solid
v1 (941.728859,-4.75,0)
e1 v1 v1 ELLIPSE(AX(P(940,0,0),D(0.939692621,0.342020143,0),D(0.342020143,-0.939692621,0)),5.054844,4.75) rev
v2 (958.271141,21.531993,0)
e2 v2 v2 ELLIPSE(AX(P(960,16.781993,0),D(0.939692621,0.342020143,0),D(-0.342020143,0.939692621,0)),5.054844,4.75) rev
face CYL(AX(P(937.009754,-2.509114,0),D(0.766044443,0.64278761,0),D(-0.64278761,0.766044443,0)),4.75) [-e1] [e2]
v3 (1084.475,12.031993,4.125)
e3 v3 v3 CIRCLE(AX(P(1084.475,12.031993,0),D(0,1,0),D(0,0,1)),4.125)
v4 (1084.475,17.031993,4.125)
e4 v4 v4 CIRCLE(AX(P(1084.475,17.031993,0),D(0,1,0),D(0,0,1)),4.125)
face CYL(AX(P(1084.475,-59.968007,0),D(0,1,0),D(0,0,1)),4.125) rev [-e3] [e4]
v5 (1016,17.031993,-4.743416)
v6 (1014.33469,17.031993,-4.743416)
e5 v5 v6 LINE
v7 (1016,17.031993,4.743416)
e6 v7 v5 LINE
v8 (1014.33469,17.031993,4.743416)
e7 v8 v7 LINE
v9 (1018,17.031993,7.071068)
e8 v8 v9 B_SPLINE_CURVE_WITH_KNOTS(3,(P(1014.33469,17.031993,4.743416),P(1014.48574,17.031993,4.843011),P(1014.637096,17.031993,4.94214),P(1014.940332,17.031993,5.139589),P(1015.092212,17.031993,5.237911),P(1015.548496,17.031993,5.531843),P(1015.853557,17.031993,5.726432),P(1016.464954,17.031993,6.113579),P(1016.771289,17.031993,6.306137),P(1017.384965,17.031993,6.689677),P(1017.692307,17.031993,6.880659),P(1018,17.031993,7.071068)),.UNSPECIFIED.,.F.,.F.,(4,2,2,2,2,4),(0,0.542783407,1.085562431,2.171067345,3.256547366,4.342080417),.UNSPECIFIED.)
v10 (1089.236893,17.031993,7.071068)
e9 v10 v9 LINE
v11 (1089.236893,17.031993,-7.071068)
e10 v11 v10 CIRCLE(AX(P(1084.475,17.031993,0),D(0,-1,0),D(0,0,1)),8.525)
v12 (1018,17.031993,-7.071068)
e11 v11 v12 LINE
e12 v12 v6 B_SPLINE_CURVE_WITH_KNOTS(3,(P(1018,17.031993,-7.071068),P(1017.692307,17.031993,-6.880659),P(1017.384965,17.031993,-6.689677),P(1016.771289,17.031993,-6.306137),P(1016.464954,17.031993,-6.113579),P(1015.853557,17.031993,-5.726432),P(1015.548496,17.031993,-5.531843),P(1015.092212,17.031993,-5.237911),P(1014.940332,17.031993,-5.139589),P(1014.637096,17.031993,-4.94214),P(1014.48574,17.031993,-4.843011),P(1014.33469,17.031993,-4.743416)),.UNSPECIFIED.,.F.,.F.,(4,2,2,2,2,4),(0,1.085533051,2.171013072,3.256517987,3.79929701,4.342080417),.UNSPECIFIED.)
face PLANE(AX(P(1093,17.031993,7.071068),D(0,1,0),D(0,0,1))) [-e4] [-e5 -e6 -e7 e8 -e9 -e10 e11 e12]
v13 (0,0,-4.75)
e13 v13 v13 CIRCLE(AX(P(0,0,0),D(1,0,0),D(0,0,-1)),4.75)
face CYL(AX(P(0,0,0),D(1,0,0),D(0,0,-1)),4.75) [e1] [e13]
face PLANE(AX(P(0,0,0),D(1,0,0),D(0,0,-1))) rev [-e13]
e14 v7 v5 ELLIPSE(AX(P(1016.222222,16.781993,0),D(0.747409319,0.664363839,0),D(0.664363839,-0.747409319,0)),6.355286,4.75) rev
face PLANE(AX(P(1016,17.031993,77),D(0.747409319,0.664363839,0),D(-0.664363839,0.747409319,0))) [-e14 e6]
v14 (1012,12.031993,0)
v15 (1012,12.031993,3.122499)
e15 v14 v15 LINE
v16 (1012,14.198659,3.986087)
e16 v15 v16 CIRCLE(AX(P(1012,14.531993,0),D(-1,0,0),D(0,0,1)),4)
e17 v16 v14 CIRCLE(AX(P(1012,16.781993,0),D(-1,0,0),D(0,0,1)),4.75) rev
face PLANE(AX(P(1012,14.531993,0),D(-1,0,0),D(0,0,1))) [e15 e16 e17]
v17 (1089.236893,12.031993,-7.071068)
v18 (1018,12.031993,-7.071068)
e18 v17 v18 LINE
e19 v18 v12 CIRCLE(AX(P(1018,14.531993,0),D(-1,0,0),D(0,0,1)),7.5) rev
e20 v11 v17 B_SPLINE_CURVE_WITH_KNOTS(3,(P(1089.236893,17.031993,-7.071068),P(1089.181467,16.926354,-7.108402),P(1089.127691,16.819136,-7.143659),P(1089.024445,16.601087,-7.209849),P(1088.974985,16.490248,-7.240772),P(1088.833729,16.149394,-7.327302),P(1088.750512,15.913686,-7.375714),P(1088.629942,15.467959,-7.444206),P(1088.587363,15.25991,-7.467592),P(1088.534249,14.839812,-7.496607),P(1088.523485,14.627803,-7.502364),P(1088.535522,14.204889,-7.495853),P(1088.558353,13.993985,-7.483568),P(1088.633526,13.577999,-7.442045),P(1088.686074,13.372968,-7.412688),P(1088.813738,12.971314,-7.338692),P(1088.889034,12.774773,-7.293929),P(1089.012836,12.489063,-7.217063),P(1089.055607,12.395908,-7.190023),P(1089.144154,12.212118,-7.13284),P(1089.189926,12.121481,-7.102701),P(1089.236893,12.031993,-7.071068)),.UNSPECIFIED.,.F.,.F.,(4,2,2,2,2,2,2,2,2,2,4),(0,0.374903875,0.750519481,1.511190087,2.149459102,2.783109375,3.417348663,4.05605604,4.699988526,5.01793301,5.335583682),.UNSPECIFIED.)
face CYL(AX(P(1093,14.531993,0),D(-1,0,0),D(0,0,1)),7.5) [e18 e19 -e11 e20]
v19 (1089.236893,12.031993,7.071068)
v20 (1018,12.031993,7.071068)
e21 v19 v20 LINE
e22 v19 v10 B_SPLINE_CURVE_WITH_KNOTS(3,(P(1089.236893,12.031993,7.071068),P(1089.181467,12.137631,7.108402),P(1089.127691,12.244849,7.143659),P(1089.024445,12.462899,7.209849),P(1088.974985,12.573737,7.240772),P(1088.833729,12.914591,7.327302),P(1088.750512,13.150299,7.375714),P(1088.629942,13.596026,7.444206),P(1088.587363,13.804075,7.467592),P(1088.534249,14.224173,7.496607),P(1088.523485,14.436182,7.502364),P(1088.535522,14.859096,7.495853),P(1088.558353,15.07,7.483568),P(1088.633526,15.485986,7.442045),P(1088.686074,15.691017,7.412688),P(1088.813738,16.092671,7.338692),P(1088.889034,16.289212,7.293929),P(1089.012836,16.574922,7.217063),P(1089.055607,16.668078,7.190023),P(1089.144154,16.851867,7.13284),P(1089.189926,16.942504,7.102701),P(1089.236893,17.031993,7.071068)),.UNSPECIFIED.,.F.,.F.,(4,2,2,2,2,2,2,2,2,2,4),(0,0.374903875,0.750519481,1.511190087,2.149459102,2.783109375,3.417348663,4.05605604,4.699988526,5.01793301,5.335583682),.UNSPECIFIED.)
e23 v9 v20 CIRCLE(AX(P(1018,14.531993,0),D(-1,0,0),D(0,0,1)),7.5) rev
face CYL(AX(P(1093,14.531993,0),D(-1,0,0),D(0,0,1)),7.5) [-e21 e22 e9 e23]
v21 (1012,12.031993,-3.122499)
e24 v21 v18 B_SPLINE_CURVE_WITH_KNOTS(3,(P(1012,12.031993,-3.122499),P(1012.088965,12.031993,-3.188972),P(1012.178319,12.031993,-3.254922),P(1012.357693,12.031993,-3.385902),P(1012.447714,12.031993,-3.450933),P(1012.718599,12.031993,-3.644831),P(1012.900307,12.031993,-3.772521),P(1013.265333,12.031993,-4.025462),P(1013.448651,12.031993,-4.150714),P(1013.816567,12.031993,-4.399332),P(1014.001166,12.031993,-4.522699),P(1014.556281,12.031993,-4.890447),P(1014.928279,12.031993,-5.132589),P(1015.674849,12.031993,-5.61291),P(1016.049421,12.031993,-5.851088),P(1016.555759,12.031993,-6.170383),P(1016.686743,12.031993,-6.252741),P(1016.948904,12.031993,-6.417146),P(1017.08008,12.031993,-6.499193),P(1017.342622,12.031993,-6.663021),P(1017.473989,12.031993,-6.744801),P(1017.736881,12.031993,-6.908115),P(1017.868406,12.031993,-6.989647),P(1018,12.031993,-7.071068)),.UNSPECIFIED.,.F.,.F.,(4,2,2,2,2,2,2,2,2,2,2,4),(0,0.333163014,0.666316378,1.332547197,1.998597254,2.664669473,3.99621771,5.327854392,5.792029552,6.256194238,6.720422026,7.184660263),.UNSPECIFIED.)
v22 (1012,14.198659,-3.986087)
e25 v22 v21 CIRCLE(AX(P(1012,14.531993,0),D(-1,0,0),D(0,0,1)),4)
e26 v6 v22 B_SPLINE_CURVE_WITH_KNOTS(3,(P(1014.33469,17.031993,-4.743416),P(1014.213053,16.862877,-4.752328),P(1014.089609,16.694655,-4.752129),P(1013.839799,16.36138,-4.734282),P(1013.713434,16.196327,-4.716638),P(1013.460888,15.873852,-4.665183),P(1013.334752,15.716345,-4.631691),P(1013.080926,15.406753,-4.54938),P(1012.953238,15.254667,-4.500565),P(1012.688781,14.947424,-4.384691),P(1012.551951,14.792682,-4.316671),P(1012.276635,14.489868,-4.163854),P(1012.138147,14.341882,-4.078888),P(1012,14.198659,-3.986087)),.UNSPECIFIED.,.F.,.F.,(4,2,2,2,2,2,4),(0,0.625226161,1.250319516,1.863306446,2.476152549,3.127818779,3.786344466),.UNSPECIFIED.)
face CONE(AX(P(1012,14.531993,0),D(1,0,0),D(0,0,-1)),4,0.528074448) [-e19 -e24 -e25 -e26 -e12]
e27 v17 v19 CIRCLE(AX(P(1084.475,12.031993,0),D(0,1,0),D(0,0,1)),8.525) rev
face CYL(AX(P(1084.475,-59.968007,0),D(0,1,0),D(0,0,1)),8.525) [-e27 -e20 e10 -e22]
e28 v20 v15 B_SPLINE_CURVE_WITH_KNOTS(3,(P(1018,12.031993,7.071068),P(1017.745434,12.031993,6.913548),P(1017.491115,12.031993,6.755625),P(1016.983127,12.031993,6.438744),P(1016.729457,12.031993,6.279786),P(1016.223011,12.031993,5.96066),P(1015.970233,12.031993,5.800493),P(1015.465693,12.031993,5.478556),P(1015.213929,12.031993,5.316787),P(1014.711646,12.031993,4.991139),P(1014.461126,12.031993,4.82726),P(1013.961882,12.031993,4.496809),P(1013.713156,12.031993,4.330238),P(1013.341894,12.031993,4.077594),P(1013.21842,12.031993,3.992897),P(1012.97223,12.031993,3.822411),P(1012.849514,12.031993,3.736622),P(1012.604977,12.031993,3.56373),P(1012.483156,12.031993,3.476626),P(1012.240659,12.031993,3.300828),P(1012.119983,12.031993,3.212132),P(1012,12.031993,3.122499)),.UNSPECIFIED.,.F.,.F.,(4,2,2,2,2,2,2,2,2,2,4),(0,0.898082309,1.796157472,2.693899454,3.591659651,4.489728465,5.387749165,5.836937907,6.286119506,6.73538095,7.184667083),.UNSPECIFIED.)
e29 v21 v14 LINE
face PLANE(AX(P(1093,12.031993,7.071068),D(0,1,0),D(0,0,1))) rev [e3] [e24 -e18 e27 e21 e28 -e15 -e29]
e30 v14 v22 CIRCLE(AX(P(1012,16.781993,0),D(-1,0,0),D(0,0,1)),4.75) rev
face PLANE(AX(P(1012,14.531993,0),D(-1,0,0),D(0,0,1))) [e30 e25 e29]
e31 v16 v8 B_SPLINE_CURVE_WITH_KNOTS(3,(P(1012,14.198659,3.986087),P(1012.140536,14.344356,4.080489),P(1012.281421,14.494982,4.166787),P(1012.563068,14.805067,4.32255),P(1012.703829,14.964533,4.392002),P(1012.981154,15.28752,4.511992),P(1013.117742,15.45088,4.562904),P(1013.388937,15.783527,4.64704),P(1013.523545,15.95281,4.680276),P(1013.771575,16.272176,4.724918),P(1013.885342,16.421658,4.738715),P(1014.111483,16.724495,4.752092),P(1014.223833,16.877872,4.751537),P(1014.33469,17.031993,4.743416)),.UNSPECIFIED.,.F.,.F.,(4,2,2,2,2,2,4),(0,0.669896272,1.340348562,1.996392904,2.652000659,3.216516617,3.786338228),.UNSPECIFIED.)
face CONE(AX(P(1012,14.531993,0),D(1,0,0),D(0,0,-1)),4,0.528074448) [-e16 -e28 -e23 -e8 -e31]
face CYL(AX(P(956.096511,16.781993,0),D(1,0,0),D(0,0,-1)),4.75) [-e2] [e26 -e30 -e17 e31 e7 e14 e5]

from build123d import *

# Parameters (mm, degrees)
SKETCH2_R               = 4.75
BOSS_EXTRUDE1_DEPTH     = 77
SKETCH4_R               = 4.125
CUT_EXTRUDE1_DEPTH      = 77
CUT_EXTRUDE2_DEPTH      = 77
CUT_EXTRUDE3_DEPTH      = 77
CUT_EXTRUDE3_DEPTH_BACK = 77
BOSS_EXTRUDE2_START     = 4
BOSS_EXTRUDE2_DEPTH     = 4
CHAMFER1_SIZE           = 6
CHAMFER1_SIZE_2         = 3.5


with BuildPart() as part:
    # Sweep1: sweep along a path in Sketch1
    with BuildLine(Plane.XY) as sweep1_path:
        Line((0, 0), (940, 0))
        Line((940, 0), (960, 16.781992624))
        Line((960, 16.781992624), (1016, 16.781992624))
    # Sketch2 → Sweep1 (sweep)
    with BuildSketch(Plane(origin=(0, 0, 0), x_dir=(0, 0, -1), z_dir=(1, 0, 0))):
        Circle(SKETCH2_R)
    sweep(path=sweep1_path.line, transition=Transition.RIGHT)

    # Sketch3 → Boss-Extrude1 (add)
    with BuildSketch(Plane(origin=(1016, 0, 0), x_dir=(0, 0, -1), z_dir=(1, 0, 0))):
        with BuildLine():
            Line((-7.071067812, 12.031992624), (7.071067812, 12.031992624))
            ThreePointArc((7.071067812, 12.031992624), (7.5, 14.531992624), (7.071067812, 17.031992624))
            Line((7.071067812, 17.031992624), (-7.071067812, 17.031992624))
            ThreePointArc((-7.071067812, 17.031992624), (-7.5, 14.531992624), (-7.071067812, 12.031992624))
        make_face()
    extrude(amount=BOSS_EXTRUDE1_DEPTH)

    # Sketch4 → Cut-Extrude1 (cut)
    with BuildSketch(Plane(origin=(0, 17.031992624, 0), x_dir=(1, 0, 0), z_dir=(0, 1, 0))):
        with Locations(Location((1084.475, 0, 0), (0, 0, 270))):
            Circle(SKETCH4_R)
    extrude(amount=-CUT_EXTRUDE1_DEPTH, mode=Mode.SUBTRACT)

    # Sketch5 → Cut-Extrude2 (cut)
    with BuildSketch(Plane(origin=(0, 17.031992624, 0), x_dir=(1, 0, 0), z_dir=(0, 1, 0))):
        with BuildLine():
            Line((1093, 7.5), (1088.527853933, 7.5))
            ThreePointArc((1088.527853933, 7.5), (1093, 0), (1088.527853933, -7.5))
            Line((1088.527853933, -7.5), (1093, -7.5))
            Line((1093, -7.5), (1095.488265068, 1.431081092))
            Line((1095.488265068, 1.431081092), (1093, 7.5))
        make_face()
    extrude(amount=-CUT_EXTRUDE2_DEPTH, mode=Mode.SUBTRACT)

    # Sketch6 → Cut-Extrude3 (cut, two sides: drawn at the far end of the back side and taken through both)
    with BuildSketch(Plane.XY.offset(-CUT_EXTRUDE3_DEPTH_BACK)):
        Polygon((1016, 17.031992624), (1012, 21.531992624), (1018.885341188, 26.165219669), (1022.40477818, 20.935058436), align=None)
    extrude(amount=CUT_EXTRUDE3_DEPTH + CUT_EXTRUDE3_DEPTH_BACK, mode=Mode.SUBTRACT)

    # Sketch7 → Boss-Extrude2 (add)
    with BuildSketch(Plane.ZY.offset(-1016).offset(BOSS_EXTRUDE2_START)):
        with BuildLine():
            Line((7.071067812, 17.031992624), (4.74341649, 17.031992624))
            Line((4.74341649, 17.031992624), (-4.74341649, 17.031992624))
            Line((-4.74341649, 17.031992624), (-7.071067812, 17.031992624))
            ThreePointArc((-7.071067812, 17.031992624), (-7.5, 14.531992624), (-7.071067812, 12.031992624))
            Line((-7.071067812, 12.031992624), (0, 12.031992624))
            Line((0, 12.031992624), (7.071067812, 12.031992624))
            ThreePointArc((7.071067812, 12.031992624), (7.5, 14.531992624), (7.071067812, 17.031992624))
        make_face()
    extrude(amount=-BOSS_EXTRUDE2_DEPTH)

    # Chamfer1
    # the kernel refuses this chamfer: 6, 3.5 mm, written as the material it takes off along each edge
    with BuildSketch(Plane(origin=(1012, 14.531992624, 0), x_dir=(0, 0.6684369034983231, 0.7437688525621206), z_dir=(0, -0.7437688525621206, 0.6684369034983231))) as chamfer1_piece_1_section:
        Polygon((7.5, -CHAMFER1_SIZE), (7.5 - CHAMFER1_SIZE_2, 0), (7.5, 0), align=None)
    chamfer1_piece_1 = revolve(axis=Axis((1012, 14.531992624, 0), (-1, 0, 0)), revolution_arc=276.106922799, mode=Mode.PRIVATE)
    chamfer1_piece_1 = chamfer1_piece_1 - Plane(origin=(1014.966337757, 16.781992624, 0), x_dir=(0, 0, -1), z_dir=(1, 0, 0)) * Cylinder(4.75, 30, mode=Mode.PRIVATE)
    add(chamfer1_piece_1, mode=Mode.SUBTRACT)
    with BuildSketch(Plane(origin=(1012, 14.531992624, 0), x_dir=(0, -0.668436903498336, -0.743768852562109), z_dir=(0, 0.743768852562109, -0.668436903498336))) as chamfer1_piece_2_section:
        Polygon((7.5 - CHAMFER1_SIZE_2, 0), (7.5, -CHAMFER1_SIZE), (7.5, 0), align=None)
    chamfer1_piece_2 = revolve(axis=Axis((1012, 14.531992624, 0), (-1, 0, 0)), revolution_arc=276.106922799, mode=Mode.PRIVATE)
    chamfer1_piece_2 = chamfer1_piece_2 - Plane(origin=(1014.966337768, 16.781992624, 0), x_dir=(0, 0, -1), z_dir=(1, 0, 0)) * Cylinder(4.75, 31, mode=Mode.PRIVATE)
    add(chamfer1_piece_2, mode=Mode.SUBTRACT)


solid = part.part
